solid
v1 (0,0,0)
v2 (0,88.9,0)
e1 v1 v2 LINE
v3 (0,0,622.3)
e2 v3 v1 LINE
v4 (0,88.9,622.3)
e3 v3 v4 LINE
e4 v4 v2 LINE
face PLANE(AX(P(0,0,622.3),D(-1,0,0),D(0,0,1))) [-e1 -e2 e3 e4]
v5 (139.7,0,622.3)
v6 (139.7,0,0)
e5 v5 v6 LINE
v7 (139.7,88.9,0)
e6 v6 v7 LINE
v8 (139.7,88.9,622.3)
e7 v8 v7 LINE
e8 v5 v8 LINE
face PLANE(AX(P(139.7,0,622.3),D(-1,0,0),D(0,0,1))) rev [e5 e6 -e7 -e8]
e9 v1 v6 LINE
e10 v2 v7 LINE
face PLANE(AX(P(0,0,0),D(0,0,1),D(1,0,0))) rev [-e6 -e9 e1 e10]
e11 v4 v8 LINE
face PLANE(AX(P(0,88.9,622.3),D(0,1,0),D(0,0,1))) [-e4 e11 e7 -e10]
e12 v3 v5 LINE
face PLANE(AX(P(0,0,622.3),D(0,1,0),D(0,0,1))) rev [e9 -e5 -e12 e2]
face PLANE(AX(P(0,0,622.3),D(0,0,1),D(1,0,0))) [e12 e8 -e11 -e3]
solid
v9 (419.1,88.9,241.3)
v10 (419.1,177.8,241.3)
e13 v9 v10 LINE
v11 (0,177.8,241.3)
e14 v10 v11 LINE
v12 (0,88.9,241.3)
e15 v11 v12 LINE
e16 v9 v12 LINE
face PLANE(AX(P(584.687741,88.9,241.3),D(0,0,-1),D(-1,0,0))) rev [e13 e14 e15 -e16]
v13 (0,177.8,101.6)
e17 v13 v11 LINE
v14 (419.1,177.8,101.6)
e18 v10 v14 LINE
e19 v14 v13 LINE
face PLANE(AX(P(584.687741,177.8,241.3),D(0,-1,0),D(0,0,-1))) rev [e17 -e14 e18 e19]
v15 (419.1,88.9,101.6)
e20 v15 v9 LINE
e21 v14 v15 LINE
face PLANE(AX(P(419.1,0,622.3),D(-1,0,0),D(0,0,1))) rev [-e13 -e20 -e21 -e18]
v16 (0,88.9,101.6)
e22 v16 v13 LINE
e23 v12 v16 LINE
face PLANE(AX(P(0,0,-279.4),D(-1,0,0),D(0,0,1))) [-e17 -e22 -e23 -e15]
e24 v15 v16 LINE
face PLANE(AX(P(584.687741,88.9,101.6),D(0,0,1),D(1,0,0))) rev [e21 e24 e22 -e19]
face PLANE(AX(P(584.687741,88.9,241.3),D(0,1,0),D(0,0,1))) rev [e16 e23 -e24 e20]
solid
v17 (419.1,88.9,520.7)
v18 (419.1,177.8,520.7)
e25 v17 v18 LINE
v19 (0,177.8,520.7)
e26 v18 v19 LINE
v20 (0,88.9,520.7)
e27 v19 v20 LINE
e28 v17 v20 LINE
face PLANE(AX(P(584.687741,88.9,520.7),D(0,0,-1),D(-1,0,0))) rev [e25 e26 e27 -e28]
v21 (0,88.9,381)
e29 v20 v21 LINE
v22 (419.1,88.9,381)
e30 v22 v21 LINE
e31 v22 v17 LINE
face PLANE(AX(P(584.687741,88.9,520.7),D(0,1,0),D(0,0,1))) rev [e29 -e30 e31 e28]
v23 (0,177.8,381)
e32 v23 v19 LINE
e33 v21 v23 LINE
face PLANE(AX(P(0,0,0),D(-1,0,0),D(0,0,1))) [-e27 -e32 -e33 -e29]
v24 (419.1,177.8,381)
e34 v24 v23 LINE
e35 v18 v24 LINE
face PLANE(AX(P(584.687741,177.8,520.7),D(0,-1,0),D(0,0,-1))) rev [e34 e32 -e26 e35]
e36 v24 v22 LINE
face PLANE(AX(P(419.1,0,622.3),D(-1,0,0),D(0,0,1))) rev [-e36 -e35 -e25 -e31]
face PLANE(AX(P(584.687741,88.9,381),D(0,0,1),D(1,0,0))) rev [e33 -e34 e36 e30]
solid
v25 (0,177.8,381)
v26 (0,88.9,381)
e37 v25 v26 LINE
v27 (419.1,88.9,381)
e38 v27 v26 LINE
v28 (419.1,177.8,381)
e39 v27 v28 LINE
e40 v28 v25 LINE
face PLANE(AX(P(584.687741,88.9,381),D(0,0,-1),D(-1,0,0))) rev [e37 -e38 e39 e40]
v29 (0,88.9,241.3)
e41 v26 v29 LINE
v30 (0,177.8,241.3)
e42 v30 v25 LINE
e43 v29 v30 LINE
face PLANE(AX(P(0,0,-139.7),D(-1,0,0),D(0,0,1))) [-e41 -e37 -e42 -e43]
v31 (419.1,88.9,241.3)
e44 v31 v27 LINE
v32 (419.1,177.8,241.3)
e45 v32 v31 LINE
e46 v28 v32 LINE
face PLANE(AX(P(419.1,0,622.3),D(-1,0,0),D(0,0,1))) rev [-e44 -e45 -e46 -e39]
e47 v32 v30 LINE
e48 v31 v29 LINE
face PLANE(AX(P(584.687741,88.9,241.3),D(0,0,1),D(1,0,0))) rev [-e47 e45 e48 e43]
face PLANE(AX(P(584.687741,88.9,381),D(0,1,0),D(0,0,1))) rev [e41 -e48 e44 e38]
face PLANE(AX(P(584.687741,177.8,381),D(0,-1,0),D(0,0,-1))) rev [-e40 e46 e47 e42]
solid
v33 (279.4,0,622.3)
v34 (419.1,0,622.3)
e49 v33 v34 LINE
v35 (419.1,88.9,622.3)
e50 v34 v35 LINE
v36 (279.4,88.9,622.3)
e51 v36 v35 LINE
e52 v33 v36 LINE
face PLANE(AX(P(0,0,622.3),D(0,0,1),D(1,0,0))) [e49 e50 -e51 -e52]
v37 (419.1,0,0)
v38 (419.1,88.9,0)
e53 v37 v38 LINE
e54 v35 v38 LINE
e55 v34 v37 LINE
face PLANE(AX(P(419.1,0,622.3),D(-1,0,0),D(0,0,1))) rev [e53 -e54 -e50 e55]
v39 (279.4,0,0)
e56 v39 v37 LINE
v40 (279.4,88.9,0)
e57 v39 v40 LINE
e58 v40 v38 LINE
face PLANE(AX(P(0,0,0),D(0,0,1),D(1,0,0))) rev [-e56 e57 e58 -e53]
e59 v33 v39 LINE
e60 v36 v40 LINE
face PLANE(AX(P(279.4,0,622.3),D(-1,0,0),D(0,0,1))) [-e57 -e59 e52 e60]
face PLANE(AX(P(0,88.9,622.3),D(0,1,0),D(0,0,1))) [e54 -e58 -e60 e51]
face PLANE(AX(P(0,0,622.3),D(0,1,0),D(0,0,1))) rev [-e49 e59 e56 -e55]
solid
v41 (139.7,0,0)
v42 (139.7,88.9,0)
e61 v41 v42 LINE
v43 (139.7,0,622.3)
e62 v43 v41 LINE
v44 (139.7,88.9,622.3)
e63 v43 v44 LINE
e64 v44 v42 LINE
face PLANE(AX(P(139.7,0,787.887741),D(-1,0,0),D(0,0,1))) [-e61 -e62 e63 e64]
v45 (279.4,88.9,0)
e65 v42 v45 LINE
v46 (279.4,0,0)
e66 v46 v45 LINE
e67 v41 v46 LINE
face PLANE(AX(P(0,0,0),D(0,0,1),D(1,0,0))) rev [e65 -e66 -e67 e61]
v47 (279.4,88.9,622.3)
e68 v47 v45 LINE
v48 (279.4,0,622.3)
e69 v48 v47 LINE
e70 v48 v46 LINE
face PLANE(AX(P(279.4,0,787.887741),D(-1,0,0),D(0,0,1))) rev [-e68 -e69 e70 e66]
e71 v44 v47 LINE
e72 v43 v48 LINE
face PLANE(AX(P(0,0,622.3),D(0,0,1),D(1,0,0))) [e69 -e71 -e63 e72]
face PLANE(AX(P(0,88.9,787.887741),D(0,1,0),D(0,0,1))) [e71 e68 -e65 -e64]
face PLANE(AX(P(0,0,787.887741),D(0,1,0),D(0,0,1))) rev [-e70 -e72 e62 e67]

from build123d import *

# Parameters (mm, degrees)
SKETCH1_W             = 139.7
SKETCH1_H             = 88.9
BOSS_EXTRUDE1_DEPTH   = 622.3
BOSS_EXTRUDE1_2_DEPTH = 622.3
SKETCH1_4_W           = 139.7
SKETCH1_4_H           = 88.9
BOSS_EXTRUDE2_DEPTH   = 622.3
SKETCH2_W             = 139.7
SKETCH2_H             = 88.9
BOSS_EXTRUDE3_DEPTH   = 419.1
LPATTERN1_OUTLINE_W   = 88.9
LPATTERN1_OUTLINE_H   = 139.7
LPATTERN1_DEPTH       = 419.1
LPATTERN1_2_OUTLINE_W = 88.9
LPATTERN1_2_OUTLINE_H = 139.7
LPATTERN1_2_DEPTH     = 419.1


# Read off the part's stored shape, not the designer's step: LPattern1
with BuildPart() as part:
    # Sketch1 → Boss-Extrude1 (new body)
    with BuildSketch(Plane.XY):
        with Locations((69.85, 44.45)):
            Rectangle(SKETCH1_W, SKETCH1_H)
    extrude(amount=BOSS_EXTRUDE1_DEPTH)


with BuildPart() as body_2:
    # Sketch1 → Boss-Extrude1 2 (new body)
    with BuildSketch(Plane.XY):
        with Locations((349.25, 44.45)):
            Rectangle(SKETCH1_W, SKETCH1_H)
    extrude(amount=BOSS_EXTRUDE1_2_DEPTH)


with BuildPart() as body_3:
    # Sketch1<4> → Boss-Extrude2 (new body)
    with BuildSketch(Plane.XY):
        with Locations((209.55, 44.45)):
            Rectangle(SKETCH1_4_W, SKETCH1_4_H)
    extrude(amount=BOSS_EXTRUDE2_DEPTH)


with BuildPart() as body_4:
    # Sketch2 → Boss-Extrude3 (new body)
    with BuildSketch(Plane(origin=(0, 0, 0), x_dir=(0, 0, -1), z_dir=(1, 0, 0))):
        with Locations((-450.85, 133.35)):
            Rectangle(SKETCH2_W, SKETCH2_H)
    extrude(amount=BOSS_EXTRUDE3_DEPTH)


with BuildPart() as body_5:
    # LPattern1 outline → LPattern1 (new body)
    with BuildSketch(Plane.YZ):
        with Locations((133.35, 171.45)):
            Rectangle(LPATTERN1_OUTLINE_W, LPATTERN1_OUTLINE_H)
    extrude(amount=LPATTERN1_DEPTH)


with BuildPart() as body_6:
    # LPattern1 2 outline → LPattern1 2 (new body)
    with BuildSketch(Plane.YZ):
        with Locations((133.35, 311.15)):
            Rectangle(LPATTERN1_2_OUTLINE_W, LPATTERN1_2_OUTLINE_H)
    extrude(amount=LPATTERN1_2_DEPTH)


solid = Compound([part.part, body_2.part, body_3.part, body_4.part, body_5.part, body_6.part])
